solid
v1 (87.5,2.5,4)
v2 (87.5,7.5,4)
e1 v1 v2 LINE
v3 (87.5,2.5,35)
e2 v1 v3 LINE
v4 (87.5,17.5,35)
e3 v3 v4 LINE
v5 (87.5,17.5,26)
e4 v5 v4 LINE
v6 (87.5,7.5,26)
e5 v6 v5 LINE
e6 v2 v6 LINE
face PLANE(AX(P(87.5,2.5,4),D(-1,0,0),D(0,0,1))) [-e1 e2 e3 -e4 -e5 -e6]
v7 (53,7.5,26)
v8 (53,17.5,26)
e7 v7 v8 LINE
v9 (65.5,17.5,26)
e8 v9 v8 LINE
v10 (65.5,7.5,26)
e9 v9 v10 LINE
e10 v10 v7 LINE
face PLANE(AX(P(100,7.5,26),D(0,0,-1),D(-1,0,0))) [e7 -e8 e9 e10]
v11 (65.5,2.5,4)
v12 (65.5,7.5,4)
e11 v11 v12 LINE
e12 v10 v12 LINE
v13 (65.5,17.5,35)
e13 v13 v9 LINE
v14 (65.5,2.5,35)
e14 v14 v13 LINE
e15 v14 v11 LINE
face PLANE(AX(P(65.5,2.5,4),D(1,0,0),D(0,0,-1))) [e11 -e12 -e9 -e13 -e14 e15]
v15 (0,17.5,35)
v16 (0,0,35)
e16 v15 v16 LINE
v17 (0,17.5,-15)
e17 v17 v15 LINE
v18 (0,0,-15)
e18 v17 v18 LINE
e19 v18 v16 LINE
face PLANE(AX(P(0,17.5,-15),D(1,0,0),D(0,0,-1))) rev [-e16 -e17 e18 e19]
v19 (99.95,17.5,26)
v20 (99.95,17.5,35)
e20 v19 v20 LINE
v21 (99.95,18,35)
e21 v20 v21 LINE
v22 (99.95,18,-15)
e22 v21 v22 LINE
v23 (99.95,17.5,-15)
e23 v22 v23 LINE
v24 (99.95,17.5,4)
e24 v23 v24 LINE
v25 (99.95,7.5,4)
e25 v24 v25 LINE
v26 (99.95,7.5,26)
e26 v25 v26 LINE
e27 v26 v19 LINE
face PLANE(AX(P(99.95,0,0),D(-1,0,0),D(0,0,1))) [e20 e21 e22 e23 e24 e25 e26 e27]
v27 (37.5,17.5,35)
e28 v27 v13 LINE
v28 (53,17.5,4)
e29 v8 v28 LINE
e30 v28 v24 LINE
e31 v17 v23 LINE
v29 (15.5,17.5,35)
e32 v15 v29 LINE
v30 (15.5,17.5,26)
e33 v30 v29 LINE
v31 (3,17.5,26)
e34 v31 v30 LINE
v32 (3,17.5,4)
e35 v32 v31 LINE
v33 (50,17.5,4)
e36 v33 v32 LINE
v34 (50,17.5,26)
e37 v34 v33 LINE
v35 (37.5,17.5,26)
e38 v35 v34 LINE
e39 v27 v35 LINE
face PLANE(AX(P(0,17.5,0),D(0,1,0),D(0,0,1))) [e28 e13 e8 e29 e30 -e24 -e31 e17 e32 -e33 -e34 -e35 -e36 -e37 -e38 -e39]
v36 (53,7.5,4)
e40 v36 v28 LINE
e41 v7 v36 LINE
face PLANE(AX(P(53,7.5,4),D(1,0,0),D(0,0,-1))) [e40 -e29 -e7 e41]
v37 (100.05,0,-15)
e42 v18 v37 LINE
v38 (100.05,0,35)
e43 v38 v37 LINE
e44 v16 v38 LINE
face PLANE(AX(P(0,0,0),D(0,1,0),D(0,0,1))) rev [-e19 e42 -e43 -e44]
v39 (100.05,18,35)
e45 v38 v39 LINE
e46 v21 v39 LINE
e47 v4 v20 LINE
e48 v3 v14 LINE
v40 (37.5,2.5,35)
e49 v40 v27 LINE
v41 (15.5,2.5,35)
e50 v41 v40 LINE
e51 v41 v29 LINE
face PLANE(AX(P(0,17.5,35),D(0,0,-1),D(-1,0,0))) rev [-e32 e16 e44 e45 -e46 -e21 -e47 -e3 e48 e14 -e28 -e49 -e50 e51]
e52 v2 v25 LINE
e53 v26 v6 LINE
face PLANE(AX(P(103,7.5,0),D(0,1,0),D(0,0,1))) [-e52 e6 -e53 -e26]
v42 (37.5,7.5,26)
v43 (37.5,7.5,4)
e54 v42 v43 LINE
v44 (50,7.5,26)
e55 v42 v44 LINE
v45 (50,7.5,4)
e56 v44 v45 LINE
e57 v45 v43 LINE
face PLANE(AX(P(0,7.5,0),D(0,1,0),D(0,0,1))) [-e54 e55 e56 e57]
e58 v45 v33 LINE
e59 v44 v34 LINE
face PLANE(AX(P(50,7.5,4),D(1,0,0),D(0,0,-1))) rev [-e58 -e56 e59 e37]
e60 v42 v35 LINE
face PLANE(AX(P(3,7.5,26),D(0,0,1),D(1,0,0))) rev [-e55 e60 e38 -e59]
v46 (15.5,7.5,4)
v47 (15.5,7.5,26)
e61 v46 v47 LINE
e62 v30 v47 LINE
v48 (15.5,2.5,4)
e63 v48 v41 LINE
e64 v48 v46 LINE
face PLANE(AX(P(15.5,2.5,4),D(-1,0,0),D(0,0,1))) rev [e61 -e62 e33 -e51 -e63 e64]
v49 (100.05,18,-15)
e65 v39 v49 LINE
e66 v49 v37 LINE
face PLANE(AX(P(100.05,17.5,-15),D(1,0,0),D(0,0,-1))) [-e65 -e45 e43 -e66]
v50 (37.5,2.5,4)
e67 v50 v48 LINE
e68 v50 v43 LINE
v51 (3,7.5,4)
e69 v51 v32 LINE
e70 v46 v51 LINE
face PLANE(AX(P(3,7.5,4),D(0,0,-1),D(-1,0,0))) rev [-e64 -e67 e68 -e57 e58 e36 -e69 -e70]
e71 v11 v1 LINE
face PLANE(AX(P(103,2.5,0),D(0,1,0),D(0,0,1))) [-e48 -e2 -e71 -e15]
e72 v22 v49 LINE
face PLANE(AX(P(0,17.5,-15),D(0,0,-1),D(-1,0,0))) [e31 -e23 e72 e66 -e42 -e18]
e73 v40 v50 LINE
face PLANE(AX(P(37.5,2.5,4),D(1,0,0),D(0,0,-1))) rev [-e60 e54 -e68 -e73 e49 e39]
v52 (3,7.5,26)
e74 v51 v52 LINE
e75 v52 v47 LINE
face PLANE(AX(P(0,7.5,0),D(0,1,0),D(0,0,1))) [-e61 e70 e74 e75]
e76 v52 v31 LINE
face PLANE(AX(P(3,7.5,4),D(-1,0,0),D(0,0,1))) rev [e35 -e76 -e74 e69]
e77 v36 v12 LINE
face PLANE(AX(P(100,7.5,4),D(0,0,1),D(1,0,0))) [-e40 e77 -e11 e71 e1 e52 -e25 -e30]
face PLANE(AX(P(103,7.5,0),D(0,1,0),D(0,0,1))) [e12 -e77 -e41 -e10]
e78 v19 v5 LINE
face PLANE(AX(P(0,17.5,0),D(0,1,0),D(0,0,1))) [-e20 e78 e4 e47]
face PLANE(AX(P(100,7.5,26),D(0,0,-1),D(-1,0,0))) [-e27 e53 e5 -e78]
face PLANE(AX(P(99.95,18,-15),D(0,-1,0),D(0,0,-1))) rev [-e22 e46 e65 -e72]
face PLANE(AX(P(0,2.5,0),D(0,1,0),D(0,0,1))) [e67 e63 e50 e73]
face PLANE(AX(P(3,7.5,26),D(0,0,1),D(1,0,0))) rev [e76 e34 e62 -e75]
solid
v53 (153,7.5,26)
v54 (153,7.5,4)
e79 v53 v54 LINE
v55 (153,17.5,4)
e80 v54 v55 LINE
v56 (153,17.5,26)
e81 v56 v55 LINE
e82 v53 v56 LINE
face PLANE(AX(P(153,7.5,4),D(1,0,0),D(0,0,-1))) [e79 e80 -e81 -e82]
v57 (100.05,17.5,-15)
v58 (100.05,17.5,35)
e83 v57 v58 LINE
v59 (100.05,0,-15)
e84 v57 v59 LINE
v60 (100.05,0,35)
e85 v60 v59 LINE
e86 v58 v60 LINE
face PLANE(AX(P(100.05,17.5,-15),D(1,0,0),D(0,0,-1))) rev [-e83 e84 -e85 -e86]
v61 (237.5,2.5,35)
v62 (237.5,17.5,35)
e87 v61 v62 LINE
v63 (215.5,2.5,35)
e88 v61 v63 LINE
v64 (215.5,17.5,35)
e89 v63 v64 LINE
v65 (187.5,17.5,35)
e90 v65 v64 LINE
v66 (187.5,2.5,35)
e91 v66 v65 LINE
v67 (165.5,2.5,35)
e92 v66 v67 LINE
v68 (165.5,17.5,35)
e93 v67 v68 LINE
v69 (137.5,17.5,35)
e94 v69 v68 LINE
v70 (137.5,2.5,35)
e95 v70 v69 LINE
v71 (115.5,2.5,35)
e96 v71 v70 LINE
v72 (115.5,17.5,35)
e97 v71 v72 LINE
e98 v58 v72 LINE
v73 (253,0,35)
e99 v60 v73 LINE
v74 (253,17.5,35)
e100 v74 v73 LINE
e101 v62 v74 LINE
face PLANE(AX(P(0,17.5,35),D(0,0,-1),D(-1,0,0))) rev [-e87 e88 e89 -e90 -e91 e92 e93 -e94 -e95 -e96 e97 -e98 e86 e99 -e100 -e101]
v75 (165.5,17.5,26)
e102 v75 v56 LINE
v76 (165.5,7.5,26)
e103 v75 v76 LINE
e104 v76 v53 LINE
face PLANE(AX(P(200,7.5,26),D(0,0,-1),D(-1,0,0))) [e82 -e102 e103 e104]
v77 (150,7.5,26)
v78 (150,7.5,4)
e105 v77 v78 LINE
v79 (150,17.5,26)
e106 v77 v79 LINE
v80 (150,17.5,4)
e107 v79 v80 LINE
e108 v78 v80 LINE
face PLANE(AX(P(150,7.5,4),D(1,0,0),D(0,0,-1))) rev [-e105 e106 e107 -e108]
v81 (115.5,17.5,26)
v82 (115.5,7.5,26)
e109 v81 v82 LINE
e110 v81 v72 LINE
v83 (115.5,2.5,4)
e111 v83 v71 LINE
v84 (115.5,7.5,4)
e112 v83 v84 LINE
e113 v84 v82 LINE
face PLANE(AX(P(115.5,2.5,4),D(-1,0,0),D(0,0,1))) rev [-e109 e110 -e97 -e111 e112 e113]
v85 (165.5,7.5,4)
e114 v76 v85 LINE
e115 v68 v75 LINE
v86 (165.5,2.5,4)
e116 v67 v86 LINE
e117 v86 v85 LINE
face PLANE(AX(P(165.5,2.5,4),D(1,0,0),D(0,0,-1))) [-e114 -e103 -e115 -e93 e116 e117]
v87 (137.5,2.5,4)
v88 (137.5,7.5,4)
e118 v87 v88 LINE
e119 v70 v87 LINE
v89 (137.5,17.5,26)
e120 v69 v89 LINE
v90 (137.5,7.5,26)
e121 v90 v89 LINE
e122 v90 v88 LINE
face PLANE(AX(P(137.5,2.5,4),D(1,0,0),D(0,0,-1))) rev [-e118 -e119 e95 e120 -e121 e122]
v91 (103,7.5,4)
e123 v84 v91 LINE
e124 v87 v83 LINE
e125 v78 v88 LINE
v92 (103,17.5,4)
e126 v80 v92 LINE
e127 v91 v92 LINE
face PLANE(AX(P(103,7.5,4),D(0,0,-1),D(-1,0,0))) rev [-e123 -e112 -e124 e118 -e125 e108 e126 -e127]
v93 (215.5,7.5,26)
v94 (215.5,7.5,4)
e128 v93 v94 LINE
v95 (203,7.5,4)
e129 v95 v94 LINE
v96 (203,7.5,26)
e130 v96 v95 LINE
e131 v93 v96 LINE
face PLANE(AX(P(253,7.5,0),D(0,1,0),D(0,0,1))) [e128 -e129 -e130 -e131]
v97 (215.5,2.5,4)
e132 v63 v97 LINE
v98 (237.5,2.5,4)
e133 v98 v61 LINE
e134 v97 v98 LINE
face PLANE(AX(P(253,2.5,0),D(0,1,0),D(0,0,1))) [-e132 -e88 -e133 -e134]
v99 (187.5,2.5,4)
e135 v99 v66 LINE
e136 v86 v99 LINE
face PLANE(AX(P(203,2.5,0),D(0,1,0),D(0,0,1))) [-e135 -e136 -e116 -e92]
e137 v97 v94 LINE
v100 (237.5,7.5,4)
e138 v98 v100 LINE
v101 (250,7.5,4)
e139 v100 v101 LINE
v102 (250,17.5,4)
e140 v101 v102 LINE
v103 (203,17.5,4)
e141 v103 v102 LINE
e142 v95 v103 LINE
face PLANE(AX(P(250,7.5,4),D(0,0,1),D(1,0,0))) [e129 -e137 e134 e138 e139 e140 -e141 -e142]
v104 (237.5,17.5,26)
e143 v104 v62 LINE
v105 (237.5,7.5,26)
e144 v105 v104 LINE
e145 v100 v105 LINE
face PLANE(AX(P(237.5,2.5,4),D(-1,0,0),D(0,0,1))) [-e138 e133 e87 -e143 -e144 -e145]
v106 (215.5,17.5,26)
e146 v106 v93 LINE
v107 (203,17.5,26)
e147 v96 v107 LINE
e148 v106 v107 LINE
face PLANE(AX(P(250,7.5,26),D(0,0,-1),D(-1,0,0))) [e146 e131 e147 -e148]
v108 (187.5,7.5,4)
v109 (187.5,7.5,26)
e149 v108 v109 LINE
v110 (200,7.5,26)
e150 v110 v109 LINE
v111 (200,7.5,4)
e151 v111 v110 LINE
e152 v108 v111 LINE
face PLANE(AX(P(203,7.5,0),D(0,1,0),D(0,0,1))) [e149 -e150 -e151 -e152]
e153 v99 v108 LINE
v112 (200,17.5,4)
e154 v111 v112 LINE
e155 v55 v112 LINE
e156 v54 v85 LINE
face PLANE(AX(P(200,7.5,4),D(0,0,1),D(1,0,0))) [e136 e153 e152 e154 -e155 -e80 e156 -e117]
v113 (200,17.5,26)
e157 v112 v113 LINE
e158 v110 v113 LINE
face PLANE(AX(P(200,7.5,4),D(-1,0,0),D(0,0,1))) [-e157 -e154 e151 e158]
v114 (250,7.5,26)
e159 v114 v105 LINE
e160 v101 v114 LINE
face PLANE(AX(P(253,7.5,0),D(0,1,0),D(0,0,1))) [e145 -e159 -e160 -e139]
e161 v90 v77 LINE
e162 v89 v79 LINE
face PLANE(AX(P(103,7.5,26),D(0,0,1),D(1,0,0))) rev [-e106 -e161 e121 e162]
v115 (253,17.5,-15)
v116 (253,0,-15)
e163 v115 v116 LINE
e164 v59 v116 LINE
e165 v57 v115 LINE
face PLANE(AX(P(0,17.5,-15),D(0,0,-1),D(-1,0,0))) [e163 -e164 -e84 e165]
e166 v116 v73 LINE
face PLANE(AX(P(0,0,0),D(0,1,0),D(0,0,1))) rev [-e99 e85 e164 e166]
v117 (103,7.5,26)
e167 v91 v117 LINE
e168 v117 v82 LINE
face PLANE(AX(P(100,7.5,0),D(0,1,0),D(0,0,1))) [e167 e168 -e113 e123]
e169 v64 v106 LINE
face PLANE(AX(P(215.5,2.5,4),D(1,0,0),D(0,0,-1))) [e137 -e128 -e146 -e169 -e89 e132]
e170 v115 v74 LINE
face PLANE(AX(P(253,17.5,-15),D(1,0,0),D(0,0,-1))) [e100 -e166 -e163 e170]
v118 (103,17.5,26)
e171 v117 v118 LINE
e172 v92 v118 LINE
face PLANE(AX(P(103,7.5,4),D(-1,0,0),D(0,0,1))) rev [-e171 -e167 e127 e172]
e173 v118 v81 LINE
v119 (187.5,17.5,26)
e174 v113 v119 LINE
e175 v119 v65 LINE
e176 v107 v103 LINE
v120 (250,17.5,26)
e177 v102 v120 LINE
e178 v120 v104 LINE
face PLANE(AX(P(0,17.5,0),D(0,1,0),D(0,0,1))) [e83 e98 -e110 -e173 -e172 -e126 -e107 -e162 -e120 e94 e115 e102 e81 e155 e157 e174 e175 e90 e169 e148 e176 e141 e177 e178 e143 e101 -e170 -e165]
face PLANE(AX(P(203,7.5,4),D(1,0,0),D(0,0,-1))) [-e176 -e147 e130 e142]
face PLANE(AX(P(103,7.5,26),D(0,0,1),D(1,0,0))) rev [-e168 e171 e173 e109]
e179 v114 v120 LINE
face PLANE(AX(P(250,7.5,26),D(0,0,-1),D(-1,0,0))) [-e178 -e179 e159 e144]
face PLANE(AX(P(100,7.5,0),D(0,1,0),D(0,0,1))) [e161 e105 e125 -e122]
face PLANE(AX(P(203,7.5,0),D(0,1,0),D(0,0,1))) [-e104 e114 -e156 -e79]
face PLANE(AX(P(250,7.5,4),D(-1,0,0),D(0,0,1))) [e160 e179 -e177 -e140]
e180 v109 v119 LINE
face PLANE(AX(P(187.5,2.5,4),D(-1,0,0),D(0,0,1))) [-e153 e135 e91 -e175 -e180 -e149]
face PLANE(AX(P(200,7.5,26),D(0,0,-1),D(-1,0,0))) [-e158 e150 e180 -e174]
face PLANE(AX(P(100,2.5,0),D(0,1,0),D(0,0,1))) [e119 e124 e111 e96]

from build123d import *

# Parameters (mm, degrees)
SKETCH1_W               = 253
SKETCH1_H               = 50
BOSS_EXTRUDE1_DEPTH     = 17.5
SKETCH2_W               = 47
SKETCH2_H               = 22
CUT_EXTRUDE1_DEPTH      = 10
SKETCH4_W               = 22
SKETCH4_H               = 31
CUT_EXTRUDE2_DEPTH      = 15
MIRROR2_COPY_1_SKETCH_W = 47
MIRROR2_COPY_1_SKETCH_H = 22
MIRROR2_COPY_1_DEPTH    = 10
MIRROR2_COPY_2_SKETCH_W = 22
MIRROR2_COPY_2_SKETCH_H = 31
MIRROR2_COPY_2_DEPTH    = 15
MIRROR2_COPY_3_SKETCH_W = 47
MIRROR2_COPY_3_SKETCH_H = 22
MIRROR2_COPY_3_DEPTH    = 10
MIRROR2_COPY_4_SKETCH_W = 22
MIRROR2_COPY_4_SKETCH_H = 31
MIRROR2_COPY_4_DEPTH    = 15
SKETCH5_W               = 50
SKETCH5_H               = 18
BOSS_EXTRUDE2_DEPTH     = 0.05


with BuildPart() as part:
    # Sketch1 → Boss-Extrude1 (new body)
    with BuildSketch(Plane(origin=(0, 0, 0), x_dir=(1, 0, 0), z_dir=(0, 1, 0))):
        with Locations((126.5, -10)):
            Rectangle(SKETCH1_W, SKETCH1_H)
    extrude(amount=BOSS_EXTRUDE1_DEPTH)

    # Sketch2 → Cut-Extrude1 (cut)
    with BuildSketch(Plane(origin=(0, 17.5, 0), x_dir=(1, 0, 0), z_dir=(0, 1, 0))):
        with Locations((26.5, -15)):
            Rectangle(SKETCH2_W, SKETCH2_H)
    cut_extrude1 = extrude(amount=-CUT_EXTRUDE1_DEPTH, mode=Mode.SUBTRACT)

    # Sketch4 → Cut-Extrude2 (cut)
    with BuildSketch(Plane(origin=(0, 17.5, 0), x_dir=(1, 0, 0), z_dir=(0, 1, 0))):
        with Locations((26.5, -19.5)):
            Rectangle(SKETCH4_W, SKETCH4_H)
    cut_extrude2 = extrude(amount=-CUT_EXTRUDE2_DEPTH, mode=Mode.SUBTRACT)

    # Mirror1: Cut-Extrude1, Cut-Extrude2 across plane
    add(cut_extrude1.mirror(Plane.ZY.offset(-51.5)), mode=Mode.SUBTRACT)
    add(cut_extrude2.mirror(Plane.ZY.offset(-51.5)), mode=Mode.SUBTRACT)

    # Mirror2 copy 1 sketch → Mirror2 copy 1 (cut)
    with BuildSketch(Plane(origin=(100, 17.5, 0), x_dir=(1, 0, 0), z_dir=(0, 1, 0))):
        with Locations((26.5, -15)):
            Rectangle(MIRROR2_COPY_1_SKETCH_W, MIRROR2_COPY_1_SKETCH_H)
    extrude(amount=-MIRROR2_COPY_1_DEPTH, mode=Mode.SUBTRACT)

    # Mirror2 copy 2 sketch → Mirror2 copy 2 (cut)
    with BuildSketch(Plane(origin=(100, 17.5, 0), x_dir=(1, 0, 0), z_dir=(0, 1, 0))):
        with Locations((26.5, -19.5)):
            Rectangle(MIRROR2_COPY_2_SKETCH_W, MIRROR2_COPY_2_SKETCH_H)
    extrude(amount=-MIRROR2_COPY_2_DEPTH, mode=Mode.SUBTRACT)

    # Mirror2 copy 3 sketch → Mirror2 copy 3 (cut)
    with BuildSketch(Plane(origin=(203, 17.5, 0), x_dir=(-1, 0, 0), z_dir=(0, 1, 0))):
        with Locations((26.5, 15)):
            Rectangle(MIRROR2_COPY_3_SKETCH_W, MIRROR2_COPY_3_SKETCH_H)
    extrude(amount=-MIRROR2_COPY_3_DEPTH, mode=Mode.SUBTRACT)

    # Mirror2 copy 4 sketch → Mirror2 copy 4 (cut)
    with BuildSketch(Plane(origin=(203, 17.5, 0), x_dir=(-1, 0, 0), z_dir=(0, 1, 0))):
        with Locations((26.5, 19.5)):
            Rectangle(MIRROR2_COPY_4_SKETCH_W, MIRROR2_COPY_4_SKETCH_H)
    extrude(amount=-MIRROR2_COPY_4_DEPTH, mode=Mode.SUBTRACT)

    # Mirror3: Cut-Extrude1, Cut-Extrude2 across plane
    add(cut_extrude1.mirror(Plane.ZY.offset(-126.5)), mode=Mode.SUBTRACT)
    add(cut_extrude2.mirror(Plane.ZY.offset(-126.5)), mode=Mode.SUBTRACT)

    # Sketch5 → Boss-Extrude2 (add, symmetric)
    with BuildSketch(Plane.ZY.offset(-100)):
        with Locations((10, 9)):
            Rectangle(SKETCH5_W, SKETCH5_H)
    extrude(amount=BOSS_EXTRUDE2_DEPTH, both=True)


with BuildPart() as body_2:
    # Split1: the piece on the far side of the plane
    add(part.part)
    split(bisect_by=Plane(origin=(100.05, 0, 0), x_dir=(0, 0, -1), z_dir=(-1, 0, 0)), keep=Keep.BOTTOM)


with BuildPart() as part_1:
    add(part.part)

    # Split1
    split(bisect_by=Plane(origin=(100.05, 0, 0), x_dir=(0, 0, -1), z_dir=(-1, 0, 0)), keep=Keep.TOP)


solid = Compound([body_2.part, part_1.part])
